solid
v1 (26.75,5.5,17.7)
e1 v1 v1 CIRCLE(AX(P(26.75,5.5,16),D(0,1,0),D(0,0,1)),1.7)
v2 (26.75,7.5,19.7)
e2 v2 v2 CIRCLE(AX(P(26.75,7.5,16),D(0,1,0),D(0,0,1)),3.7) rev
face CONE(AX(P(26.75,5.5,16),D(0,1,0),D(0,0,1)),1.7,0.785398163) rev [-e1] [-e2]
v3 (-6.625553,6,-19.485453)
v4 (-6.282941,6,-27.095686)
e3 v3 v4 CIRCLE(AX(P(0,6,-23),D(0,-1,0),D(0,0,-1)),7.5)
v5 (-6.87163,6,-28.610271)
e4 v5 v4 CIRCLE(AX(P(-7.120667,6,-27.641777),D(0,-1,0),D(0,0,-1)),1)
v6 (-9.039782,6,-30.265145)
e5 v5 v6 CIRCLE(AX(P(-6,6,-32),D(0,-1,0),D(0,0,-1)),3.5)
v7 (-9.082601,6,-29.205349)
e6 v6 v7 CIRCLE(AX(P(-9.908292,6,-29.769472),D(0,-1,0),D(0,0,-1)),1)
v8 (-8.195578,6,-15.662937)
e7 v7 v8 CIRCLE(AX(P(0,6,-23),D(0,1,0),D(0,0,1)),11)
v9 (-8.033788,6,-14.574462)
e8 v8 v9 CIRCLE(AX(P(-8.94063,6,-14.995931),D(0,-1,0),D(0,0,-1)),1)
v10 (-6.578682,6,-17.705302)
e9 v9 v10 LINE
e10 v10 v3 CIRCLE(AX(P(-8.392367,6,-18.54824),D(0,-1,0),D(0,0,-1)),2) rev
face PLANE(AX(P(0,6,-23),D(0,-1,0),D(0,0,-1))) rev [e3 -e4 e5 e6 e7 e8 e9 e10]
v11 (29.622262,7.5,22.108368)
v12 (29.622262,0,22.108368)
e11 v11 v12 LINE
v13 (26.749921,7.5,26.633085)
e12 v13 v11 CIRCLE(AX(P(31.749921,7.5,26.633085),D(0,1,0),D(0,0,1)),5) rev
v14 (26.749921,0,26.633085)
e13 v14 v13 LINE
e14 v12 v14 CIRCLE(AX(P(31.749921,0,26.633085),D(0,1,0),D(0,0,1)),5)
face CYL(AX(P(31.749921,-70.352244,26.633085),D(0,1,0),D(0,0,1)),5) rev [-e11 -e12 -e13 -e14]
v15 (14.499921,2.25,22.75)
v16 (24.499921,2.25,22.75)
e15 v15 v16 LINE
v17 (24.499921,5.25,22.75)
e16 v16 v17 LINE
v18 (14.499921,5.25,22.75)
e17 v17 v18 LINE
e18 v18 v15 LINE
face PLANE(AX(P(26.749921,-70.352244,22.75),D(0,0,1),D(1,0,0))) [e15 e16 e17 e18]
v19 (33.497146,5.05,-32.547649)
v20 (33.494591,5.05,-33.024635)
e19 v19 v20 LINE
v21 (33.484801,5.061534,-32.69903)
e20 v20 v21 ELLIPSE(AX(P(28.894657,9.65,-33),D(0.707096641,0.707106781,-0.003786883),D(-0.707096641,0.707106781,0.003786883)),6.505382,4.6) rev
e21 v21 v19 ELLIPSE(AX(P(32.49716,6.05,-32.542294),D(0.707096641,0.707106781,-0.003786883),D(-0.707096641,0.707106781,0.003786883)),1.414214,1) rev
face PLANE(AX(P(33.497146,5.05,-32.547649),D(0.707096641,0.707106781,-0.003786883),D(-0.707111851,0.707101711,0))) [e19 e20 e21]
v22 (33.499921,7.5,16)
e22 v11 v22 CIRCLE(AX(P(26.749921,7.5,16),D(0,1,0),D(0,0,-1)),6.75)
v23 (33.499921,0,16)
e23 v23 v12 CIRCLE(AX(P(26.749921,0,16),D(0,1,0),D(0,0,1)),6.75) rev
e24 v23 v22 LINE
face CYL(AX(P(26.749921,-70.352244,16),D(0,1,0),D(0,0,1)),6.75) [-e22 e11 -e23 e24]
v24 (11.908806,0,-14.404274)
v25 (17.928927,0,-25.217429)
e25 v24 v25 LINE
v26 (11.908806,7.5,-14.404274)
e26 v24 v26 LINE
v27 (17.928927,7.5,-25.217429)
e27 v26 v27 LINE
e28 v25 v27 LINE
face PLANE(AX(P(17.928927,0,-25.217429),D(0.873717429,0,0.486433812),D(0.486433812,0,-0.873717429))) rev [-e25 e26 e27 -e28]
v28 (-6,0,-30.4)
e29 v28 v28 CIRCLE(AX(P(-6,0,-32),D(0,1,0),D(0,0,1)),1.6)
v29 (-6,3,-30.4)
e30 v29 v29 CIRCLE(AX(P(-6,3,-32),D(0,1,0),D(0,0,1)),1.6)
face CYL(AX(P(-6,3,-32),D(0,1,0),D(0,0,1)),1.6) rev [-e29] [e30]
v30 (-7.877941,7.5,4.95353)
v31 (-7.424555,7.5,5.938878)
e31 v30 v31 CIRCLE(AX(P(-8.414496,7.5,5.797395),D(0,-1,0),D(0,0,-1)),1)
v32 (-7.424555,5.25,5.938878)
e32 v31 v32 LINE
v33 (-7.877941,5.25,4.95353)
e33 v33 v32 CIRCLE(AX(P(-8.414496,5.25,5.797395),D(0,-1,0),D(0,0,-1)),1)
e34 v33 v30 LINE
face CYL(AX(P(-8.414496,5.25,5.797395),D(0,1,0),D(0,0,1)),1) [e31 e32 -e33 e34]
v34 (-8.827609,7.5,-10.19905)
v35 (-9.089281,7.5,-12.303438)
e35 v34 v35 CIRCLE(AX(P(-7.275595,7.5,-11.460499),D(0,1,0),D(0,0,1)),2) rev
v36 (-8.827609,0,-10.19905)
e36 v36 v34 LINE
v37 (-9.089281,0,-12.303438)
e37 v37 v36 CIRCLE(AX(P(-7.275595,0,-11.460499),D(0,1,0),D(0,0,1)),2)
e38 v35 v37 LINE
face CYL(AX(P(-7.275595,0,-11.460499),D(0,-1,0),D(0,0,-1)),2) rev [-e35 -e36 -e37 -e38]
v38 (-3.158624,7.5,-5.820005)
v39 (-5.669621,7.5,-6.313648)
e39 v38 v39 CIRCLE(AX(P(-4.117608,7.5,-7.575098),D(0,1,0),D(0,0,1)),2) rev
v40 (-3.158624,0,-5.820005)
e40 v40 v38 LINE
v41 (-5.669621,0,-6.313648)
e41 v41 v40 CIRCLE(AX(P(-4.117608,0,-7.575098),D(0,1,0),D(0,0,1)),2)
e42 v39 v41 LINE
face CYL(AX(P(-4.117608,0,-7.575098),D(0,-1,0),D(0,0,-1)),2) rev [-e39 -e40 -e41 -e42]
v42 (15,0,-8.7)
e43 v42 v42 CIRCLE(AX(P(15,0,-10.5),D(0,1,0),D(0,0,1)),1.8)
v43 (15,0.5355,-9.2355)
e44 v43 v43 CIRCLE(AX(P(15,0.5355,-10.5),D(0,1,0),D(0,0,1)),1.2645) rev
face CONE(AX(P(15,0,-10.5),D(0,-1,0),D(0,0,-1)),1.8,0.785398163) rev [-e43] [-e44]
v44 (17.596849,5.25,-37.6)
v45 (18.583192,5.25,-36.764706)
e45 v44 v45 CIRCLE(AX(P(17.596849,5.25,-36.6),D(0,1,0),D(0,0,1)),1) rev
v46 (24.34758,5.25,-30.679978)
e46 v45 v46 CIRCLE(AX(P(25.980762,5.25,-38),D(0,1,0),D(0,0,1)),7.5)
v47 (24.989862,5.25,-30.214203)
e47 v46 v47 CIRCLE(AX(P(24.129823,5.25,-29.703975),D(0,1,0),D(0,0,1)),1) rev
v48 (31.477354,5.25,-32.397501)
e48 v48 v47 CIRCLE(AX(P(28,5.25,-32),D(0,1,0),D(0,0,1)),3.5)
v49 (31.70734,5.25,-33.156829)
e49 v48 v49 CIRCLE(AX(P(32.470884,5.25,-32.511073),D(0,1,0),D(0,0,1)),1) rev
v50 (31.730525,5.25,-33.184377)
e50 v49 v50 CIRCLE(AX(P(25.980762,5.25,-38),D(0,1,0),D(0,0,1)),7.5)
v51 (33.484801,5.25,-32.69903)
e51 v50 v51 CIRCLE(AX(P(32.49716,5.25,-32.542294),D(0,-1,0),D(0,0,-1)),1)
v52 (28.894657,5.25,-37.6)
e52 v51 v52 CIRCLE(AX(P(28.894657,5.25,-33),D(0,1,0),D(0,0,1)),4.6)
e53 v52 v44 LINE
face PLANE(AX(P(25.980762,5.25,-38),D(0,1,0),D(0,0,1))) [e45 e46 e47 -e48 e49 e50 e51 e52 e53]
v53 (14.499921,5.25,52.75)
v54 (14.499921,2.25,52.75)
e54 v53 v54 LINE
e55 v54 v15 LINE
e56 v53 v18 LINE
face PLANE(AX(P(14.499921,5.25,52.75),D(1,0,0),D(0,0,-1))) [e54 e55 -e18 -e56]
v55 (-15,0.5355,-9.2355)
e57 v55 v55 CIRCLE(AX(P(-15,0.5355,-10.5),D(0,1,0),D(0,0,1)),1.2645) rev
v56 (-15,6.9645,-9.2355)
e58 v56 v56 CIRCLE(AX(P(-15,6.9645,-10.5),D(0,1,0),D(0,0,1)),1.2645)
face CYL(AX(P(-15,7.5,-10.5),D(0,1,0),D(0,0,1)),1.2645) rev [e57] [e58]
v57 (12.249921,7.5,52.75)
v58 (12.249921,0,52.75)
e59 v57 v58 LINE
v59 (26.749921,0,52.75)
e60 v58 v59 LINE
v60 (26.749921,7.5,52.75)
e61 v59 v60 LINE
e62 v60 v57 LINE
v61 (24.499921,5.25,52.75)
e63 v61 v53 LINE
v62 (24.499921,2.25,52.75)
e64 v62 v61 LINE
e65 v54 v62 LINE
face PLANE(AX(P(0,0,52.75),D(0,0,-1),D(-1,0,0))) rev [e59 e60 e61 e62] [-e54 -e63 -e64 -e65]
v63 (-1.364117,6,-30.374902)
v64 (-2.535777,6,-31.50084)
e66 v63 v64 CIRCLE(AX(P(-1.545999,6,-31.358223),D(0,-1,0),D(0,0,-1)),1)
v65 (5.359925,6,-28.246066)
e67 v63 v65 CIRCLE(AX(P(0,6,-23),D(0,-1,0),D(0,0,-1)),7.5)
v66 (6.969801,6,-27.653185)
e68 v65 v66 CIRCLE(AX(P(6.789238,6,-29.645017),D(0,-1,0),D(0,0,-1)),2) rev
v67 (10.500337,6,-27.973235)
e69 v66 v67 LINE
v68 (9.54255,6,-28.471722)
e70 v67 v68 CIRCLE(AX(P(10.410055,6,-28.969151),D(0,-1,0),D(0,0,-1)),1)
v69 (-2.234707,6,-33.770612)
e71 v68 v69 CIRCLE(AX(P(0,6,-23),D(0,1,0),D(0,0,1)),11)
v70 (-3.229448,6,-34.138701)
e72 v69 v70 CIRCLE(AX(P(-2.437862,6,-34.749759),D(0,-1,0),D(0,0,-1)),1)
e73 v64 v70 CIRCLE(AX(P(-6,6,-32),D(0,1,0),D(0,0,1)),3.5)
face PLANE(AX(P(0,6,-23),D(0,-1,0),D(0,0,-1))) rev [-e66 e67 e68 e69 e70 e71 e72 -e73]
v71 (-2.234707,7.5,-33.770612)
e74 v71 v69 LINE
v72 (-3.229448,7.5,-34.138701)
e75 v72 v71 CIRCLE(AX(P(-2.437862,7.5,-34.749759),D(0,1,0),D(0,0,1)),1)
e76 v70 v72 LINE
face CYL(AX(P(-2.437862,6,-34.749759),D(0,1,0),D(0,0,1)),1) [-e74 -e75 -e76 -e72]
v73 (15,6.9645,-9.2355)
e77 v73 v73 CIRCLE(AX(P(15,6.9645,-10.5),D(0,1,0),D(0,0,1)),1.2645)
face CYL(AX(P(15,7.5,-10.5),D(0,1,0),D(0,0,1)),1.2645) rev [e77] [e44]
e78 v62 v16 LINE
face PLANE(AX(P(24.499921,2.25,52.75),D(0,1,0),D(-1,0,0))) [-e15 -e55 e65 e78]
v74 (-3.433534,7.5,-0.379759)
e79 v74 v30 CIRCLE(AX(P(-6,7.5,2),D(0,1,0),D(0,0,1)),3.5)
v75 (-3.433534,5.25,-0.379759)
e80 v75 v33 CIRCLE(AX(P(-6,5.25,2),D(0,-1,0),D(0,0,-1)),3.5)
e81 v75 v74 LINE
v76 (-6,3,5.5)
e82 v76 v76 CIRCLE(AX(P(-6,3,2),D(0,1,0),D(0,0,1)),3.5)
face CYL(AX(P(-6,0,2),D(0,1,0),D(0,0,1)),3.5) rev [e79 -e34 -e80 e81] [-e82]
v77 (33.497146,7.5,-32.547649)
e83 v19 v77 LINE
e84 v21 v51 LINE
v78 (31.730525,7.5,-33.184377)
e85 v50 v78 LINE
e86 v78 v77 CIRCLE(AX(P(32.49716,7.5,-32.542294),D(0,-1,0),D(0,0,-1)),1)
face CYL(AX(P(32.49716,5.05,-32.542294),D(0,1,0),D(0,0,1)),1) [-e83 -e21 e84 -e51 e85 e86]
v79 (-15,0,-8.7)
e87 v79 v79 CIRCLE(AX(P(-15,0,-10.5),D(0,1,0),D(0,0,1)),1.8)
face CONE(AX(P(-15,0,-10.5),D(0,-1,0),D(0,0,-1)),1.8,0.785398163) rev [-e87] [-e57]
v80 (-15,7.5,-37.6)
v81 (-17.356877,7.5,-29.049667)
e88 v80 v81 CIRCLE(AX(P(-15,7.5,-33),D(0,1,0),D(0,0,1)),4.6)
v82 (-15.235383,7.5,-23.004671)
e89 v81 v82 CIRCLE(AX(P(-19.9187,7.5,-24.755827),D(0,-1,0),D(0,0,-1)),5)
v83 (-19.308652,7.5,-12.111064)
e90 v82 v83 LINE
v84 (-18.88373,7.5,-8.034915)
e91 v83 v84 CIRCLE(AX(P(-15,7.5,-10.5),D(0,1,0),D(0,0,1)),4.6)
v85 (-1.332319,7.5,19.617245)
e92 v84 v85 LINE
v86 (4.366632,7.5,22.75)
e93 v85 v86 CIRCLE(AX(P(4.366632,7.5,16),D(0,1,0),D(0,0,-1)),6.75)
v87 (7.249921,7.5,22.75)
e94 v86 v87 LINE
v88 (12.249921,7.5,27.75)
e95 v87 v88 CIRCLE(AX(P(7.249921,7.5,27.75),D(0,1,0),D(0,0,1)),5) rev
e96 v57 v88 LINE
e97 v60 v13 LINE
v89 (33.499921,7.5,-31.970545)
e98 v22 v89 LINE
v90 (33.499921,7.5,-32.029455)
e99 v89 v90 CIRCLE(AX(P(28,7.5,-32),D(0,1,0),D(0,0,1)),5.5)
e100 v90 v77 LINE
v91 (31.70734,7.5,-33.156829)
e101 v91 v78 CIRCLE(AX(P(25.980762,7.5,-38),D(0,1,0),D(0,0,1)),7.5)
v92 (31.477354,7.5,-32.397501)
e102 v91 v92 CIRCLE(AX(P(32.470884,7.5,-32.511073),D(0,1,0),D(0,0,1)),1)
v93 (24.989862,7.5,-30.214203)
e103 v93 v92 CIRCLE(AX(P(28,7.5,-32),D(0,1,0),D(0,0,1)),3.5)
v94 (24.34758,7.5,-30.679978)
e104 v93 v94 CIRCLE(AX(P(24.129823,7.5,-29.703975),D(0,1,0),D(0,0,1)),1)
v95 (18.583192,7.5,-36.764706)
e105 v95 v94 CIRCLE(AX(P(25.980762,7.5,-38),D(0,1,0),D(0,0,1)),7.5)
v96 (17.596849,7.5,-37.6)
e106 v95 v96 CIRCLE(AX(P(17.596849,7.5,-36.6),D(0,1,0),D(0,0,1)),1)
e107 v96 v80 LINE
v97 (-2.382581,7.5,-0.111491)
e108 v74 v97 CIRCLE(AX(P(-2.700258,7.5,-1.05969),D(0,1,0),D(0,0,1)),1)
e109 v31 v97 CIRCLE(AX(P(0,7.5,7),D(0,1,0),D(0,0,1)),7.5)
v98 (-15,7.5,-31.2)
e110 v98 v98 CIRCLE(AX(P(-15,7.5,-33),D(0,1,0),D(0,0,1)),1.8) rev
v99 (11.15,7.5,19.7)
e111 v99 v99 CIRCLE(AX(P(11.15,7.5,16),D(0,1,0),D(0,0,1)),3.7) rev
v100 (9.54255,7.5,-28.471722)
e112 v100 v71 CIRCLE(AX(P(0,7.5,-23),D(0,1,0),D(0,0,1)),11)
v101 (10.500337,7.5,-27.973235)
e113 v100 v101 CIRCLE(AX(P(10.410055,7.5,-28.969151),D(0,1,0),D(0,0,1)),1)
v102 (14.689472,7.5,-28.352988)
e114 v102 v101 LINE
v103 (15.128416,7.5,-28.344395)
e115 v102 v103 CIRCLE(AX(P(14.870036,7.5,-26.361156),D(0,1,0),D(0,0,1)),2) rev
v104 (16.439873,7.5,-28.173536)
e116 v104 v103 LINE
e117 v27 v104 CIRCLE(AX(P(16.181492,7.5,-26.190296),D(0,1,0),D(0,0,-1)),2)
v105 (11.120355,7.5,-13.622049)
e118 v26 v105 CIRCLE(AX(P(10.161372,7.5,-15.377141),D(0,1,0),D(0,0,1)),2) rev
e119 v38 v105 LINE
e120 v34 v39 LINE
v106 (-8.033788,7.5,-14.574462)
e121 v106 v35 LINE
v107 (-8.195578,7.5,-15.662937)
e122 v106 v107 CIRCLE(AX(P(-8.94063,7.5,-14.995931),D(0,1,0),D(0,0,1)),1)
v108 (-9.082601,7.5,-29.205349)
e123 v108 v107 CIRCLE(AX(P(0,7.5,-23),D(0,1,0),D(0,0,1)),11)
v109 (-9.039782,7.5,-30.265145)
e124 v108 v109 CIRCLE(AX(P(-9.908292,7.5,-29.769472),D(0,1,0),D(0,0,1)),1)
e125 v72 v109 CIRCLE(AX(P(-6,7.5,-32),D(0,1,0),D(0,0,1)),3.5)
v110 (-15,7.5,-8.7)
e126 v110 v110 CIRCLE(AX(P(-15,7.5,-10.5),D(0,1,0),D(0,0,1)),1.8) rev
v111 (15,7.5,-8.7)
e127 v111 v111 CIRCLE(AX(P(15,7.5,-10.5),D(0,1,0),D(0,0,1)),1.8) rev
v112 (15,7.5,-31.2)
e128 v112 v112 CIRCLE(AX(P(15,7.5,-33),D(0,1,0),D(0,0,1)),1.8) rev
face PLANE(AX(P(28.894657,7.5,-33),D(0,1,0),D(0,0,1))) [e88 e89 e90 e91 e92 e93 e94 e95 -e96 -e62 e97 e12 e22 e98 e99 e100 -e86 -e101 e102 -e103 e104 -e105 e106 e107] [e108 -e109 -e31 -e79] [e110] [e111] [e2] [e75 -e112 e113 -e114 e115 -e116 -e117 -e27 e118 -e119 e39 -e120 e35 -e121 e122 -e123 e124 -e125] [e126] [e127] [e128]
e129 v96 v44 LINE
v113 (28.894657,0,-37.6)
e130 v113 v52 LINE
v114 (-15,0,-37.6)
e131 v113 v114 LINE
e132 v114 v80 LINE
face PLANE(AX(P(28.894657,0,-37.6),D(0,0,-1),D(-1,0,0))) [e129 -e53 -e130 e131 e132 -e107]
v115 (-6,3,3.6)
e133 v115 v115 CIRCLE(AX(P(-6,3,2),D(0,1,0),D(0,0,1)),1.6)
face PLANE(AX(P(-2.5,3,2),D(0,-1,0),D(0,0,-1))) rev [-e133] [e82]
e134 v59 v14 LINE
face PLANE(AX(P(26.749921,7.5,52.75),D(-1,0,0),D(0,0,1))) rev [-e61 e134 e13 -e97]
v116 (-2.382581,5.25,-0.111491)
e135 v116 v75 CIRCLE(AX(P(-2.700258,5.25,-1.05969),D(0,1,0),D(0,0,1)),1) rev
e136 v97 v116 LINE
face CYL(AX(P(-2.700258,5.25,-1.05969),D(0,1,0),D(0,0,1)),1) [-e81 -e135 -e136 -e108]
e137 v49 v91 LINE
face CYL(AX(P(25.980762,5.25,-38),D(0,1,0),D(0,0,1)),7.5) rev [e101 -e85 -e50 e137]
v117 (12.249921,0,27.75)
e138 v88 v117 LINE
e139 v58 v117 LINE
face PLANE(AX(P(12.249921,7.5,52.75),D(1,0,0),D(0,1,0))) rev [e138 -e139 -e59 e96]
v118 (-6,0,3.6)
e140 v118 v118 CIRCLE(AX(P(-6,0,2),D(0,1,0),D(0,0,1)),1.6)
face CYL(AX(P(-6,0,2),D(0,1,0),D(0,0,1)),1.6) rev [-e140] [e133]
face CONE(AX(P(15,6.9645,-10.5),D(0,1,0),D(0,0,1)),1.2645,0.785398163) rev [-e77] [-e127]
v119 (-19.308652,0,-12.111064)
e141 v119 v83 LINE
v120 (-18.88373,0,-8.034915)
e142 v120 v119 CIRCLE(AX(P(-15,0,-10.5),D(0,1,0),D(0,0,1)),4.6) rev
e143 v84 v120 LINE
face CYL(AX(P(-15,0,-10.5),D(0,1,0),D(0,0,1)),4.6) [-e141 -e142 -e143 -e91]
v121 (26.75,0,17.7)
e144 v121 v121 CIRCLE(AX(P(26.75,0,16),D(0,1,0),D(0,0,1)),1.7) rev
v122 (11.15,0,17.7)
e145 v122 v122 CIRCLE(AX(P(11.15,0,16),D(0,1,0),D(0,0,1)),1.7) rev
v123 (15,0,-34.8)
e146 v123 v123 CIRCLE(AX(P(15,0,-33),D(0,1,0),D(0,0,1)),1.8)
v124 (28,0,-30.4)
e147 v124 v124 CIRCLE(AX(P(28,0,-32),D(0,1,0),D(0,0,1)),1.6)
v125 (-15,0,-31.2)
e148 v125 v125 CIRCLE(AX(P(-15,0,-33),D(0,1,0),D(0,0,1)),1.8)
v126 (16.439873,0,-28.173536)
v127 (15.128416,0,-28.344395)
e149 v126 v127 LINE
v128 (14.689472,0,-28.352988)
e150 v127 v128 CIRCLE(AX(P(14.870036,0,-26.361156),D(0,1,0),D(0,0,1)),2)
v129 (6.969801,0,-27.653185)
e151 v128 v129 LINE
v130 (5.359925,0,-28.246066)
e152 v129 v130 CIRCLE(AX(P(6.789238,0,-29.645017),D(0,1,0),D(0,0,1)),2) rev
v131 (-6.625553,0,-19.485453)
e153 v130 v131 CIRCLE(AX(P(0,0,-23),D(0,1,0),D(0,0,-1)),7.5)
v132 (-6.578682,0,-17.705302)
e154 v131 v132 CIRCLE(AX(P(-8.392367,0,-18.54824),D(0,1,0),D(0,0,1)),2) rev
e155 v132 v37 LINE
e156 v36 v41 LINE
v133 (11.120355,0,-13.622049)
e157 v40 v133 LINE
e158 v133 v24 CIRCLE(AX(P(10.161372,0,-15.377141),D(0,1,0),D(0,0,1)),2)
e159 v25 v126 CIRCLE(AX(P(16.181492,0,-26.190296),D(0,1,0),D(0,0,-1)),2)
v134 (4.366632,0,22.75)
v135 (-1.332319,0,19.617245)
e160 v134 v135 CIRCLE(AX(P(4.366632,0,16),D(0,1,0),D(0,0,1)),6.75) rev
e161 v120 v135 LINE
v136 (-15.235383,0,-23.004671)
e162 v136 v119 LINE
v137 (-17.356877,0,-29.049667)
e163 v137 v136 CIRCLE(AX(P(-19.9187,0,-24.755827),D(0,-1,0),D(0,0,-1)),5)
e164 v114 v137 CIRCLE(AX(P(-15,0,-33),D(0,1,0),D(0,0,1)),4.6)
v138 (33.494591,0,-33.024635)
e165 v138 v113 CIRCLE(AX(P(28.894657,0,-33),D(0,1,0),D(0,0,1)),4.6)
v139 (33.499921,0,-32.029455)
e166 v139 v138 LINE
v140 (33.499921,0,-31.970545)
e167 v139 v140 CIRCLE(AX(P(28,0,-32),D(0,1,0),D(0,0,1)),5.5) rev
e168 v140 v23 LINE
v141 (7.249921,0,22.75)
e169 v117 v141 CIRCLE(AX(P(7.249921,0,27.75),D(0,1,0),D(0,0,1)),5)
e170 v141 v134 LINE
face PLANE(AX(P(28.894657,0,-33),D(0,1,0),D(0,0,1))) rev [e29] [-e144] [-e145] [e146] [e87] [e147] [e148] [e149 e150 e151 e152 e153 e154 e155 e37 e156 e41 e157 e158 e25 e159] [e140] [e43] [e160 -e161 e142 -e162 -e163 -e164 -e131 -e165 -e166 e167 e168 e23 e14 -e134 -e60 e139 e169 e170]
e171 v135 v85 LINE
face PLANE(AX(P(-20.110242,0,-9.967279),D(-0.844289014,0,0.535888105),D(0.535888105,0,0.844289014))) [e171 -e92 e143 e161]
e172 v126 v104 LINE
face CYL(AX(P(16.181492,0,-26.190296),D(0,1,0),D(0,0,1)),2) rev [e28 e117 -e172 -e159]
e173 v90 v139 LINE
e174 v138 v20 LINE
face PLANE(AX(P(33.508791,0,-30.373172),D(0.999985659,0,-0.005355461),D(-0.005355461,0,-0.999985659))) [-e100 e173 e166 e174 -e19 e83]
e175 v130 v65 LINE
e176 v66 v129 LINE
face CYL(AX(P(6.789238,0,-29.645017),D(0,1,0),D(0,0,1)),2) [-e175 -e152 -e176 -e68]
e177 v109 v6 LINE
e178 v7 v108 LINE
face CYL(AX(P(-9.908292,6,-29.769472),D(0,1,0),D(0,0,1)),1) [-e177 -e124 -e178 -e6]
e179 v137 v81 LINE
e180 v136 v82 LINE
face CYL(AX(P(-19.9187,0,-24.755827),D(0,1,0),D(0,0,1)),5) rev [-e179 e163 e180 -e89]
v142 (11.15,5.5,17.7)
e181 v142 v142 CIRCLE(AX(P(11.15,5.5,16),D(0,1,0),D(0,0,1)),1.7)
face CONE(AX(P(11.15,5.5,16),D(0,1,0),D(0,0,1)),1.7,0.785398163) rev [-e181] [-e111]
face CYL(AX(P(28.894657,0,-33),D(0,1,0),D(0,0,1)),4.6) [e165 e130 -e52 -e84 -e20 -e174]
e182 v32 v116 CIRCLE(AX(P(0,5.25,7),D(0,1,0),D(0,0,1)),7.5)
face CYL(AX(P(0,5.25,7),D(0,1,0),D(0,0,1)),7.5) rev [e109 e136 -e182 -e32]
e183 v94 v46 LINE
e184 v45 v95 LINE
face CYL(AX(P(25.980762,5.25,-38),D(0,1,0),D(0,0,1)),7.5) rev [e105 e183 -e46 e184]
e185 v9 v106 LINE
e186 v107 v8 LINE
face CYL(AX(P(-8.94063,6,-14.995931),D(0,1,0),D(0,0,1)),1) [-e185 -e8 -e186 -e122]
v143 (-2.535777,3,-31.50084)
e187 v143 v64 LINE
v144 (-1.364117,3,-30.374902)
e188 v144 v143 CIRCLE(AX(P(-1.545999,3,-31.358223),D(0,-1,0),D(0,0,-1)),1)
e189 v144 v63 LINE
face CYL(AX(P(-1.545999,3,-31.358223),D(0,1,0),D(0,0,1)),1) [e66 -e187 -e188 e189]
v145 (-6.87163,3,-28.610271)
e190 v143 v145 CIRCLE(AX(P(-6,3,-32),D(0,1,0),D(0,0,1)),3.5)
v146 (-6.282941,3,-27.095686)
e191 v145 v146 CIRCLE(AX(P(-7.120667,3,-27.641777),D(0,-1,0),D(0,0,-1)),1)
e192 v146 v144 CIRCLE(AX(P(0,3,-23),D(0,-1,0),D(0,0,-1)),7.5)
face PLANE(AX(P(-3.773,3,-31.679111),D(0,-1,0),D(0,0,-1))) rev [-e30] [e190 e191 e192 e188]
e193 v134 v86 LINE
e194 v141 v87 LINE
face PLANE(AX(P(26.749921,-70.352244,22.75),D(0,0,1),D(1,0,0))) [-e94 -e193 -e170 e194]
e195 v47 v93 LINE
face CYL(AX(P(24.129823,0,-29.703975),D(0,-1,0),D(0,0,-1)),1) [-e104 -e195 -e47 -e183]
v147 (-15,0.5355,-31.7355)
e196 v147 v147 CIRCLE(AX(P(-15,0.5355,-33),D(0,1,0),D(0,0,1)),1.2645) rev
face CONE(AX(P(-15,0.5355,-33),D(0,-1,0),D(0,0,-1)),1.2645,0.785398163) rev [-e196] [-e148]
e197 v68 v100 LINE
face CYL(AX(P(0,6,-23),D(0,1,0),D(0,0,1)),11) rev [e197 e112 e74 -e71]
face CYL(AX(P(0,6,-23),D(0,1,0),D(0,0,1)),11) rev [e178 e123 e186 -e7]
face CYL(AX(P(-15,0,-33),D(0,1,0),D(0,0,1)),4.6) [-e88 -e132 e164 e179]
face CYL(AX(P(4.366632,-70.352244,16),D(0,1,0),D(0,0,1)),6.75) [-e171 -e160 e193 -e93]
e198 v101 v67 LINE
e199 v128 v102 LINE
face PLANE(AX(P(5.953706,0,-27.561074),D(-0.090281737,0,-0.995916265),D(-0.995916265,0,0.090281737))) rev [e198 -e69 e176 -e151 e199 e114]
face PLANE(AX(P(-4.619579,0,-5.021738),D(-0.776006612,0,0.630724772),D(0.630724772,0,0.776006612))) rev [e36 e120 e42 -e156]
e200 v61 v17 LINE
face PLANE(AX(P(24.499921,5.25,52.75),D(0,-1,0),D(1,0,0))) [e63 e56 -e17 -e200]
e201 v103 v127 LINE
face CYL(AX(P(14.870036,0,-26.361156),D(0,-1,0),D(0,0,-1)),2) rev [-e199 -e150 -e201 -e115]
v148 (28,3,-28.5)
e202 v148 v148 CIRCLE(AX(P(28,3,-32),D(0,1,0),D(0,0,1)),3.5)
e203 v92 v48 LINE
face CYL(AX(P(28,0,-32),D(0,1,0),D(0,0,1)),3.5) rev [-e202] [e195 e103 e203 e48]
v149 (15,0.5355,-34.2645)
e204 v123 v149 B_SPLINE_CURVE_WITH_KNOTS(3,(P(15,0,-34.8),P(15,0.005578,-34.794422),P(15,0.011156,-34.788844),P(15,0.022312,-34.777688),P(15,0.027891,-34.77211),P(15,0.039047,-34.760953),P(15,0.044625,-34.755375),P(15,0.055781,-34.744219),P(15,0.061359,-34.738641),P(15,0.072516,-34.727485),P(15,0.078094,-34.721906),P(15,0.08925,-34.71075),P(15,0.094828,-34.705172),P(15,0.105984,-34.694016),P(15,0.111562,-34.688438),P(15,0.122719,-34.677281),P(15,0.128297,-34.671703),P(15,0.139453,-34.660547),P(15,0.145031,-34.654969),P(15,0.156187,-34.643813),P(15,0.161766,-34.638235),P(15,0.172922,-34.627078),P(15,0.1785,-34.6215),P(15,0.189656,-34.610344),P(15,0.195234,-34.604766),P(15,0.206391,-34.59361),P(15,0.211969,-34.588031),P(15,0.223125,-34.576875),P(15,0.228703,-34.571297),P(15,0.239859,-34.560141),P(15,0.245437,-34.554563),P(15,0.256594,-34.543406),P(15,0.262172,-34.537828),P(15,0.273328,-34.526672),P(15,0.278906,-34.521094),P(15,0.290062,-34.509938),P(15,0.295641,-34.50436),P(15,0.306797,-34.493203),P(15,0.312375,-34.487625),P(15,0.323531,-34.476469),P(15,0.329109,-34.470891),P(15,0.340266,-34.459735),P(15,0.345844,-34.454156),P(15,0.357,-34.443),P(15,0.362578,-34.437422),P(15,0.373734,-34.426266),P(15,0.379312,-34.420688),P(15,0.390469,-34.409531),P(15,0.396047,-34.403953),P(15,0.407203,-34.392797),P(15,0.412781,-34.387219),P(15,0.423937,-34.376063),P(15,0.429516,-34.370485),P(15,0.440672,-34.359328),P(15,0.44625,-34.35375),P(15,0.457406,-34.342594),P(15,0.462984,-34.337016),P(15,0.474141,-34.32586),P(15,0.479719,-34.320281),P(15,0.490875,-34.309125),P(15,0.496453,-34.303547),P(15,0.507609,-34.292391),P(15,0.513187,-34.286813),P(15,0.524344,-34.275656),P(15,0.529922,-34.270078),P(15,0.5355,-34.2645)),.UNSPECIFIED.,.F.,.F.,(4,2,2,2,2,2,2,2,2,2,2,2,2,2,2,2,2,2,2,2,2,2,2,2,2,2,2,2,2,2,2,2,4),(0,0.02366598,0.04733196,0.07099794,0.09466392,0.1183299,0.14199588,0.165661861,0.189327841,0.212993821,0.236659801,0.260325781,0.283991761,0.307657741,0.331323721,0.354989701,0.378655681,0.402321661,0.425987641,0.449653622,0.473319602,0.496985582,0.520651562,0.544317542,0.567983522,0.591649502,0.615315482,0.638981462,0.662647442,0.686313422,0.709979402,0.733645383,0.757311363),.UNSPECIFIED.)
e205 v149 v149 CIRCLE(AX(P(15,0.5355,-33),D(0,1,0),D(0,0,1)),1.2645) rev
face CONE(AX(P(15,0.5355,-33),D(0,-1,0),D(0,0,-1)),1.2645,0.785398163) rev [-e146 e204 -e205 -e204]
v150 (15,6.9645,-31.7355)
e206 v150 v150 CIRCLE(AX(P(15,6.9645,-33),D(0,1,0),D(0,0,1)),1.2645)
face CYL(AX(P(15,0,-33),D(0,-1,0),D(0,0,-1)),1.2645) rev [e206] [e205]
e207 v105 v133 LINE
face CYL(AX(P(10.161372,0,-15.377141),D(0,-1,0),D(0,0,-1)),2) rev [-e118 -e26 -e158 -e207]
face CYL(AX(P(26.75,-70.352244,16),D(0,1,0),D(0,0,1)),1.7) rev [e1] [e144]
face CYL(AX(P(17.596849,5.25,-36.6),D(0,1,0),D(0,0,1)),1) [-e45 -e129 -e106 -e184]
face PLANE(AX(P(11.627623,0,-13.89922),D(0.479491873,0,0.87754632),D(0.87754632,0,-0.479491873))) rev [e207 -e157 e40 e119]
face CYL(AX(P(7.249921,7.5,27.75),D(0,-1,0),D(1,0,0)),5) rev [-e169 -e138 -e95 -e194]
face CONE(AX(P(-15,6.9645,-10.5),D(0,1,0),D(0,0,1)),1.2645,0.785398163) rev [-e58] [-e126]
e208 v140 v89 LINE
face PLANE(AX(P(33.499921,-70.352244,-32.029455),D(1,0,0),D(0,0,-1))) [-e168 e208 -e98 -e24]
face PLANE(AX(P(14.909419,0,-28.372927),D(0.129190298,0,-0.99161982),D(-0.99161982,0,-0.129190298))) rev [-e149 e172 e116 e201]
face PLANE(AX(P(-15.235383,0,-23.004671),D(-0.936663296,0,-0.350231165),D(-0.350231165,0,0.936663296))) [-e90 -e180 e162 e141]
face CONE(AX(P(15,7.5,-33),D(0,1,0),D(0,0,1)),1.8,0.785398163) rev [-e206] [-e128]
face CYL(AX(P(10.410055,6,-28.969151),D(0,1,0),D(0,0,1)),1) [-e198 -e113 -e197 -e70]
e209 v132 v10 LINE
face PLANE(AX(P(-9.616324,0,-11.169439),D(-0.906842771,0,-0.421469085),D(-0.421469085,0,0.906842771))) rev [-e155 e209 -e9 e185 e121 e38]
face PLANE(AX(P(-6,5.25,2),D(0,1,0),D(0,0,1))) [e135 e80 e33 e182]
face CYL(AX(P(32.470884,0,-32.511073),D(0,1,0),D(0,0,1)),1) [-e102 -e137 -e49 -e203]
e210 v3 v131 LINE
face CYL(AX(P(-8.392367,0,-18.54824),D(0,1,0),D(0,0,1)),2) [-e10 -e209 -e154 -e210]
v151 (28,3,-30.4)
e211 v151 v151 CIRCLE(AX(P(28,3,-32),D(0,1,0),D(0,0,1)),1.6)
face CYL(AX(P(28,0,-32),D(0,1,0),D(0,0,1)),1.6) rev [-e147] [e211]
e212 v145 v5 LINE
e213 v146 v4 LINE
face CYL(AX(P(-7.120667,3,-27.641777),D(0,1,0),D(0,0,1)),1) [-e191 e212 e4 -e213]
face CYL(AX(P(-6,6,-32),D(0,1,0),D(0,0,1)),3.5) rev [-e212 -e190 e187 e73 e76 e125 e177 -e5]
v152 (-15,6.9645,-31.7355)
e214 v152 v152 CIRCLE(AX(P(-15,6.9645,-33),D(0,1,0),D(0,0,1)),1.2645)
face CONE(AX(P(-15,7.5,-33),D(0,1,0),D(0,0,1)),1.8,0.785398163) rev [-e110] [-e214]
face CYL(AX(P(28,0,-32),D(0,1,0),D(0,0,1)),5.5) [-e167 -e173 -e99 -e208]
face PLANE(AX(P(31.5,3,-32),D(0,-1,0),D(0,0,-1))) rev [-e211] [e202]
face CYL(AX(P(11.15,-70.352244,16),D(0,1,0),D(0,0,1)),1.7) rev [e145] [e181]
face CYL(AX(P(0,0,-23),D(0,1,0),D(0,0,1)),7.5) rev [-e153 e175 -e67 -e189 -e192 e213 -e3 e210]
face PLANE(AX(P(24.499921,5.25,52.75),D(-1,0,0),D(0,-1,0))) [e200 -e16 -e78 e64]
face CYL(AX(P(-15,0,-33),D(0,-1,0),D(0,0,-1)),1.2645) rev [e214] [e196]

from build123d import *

# Parameters (mm, degrees)
BOSS_EXTRUDE1_DEPTH        = 7.5
CUT_EXTRUDE1_DEPTH         = 2.45
CUT_EXTRUDE2_DEPTH         = 2.25
CUT_EXTRUDE3_DEPTH         = 1.5
CUT_EXTRUDE4_DEPTH         = 3
CUT_EXTRUDE5_DEPTH         = 2.25
DRAFT1_ANGLE               = 45
F_3_2_3_2_DIAMETER_HOLE1_D = 3.2
M2_CLEARANCE_HOLE1_D       = 2.529
M2_CLEARANCE_HOLE2_D       = 2.529
FILLET1_START              = 6
FILLET1_DEPTH              = 2
FILLET1_START_2            = 5.25
FILLET1_2_DEPTH            = 1.45785
FILLET2_R                  = 2
FILLET3_R                  = 4.6
FILLET4_R                  = 5.5
CHAMFER2_SIZE              = 0.5355
SKETCH15_R                 = 1.7
BOSS_EXTRUDE2_DEPTH        = 7.5
SKETCH16_R                 = 7.5
CUT_EXTRUDE6_DEPTH         = 51.631734262
BOSS_EXTRUDE3_START        = 2.25
BOSS_EXTRUDE3_DEPTH        = 2.25
CHAMFER3_SIZE              = 2
SKETCH18_W                 = 14.5
SKETCH18_H                 = 7.5
SKETCH18_W_2               = 10
SKETCH18_H_2               = 3
BOSS_EXTRUDE4_DEPTH        = 30
FILLET5_R                  = 5


with BuildPart() as part:
    # Sketch1 → Boss-Extrude1 (new body)
    with BuildSketch(Plane(origin=(0, 7.5, 0), x_dir=(1, 0, 0), z_dir=(0, 1, 0))):
        with BuildLine():
            Line((33.508791414, 30.373171934), (33.494591401, 33.024635312))
            ThreePointArc((33.494591401, 33.024635312), (32.138627038, 36.261389585), (28.894657368, 37.600000191))
            Line((28.894657368, 37.600000191), (-15.000000337, 37.600000191))
            ThreePointArc((-15.000000337, 37.600000191), (-19.434610369, 34.222388779), (-17.356877162, 29.049667087))
            ThreePointArc((-17.356877162, 29.049667087), (-15.200807807, 26.41157286), (-15.235383316, 23.004670931))
            Line((-15.235383316, 23.004670931), (-20.110241908, 9.967278565))
            Line((-20.110241908, 9.967278565), (-10.643589577, -4.947384576))
            ThreePointArc((-10.643589577, -4.947384576), (-7.177416672, -7.372493833), (-3.014699262, -6.619305089))
            Line((-3.014699262, -6.619305089), (18.314983661, 7.165348002))
            Line((18.314983661, 7.165348002), (33.508791414, 30.373171934))
        make_face()
        with BuildLine():
            Line((5.953705515, 27.561073907), (14.90941878, 28.372926652))
            Line((14.90941878, 28.372926652), (16.439872709, 28.173535922))
            ThreePointArc((16.439872709, 28.173535922), (17.967679799, 27.090037106), (17.928926971, 25.217428657))
            Line((17.928926971, 25.217428657), (11.627622505, 13.899219688))
            Line((11.627622505, 13.899219688), (-4.619579129, 5.021738281))
            Line((-4.619579129, 5.021738281), (-9.616324178, 11.1694391))
            Line((-9.616324178, 11.1694391), (-6.12774016, 18.675558318))
            ThreePointArc((-6.12774016, 18.675558318), (-4.443609513, 29.041881421), (5.953705515, 27.561073907))
        make_face(mode=Mode.SUBTRACT)
    extrude(amount=-BOSS_EXTRUDE1_DEPTH)

    # Sketch2 → Cut-Extrude1 (cut)
    with BuildSketch(Plane(origin=(0, 7.5, 0), x_dir=(-1, 0, 0), z_dir=(0, 1, 0))):
        with BuildLine():
            Line((-33.497145917, -32.54764942), (-33.494591401, -33.024635312))
            ThreePointArc((-33.494591401, -33.024635312), (-33.492579262, -32.86174588), (-33.484800813, -32.699029834))
            ThreePointArc((-33.484800813, -32.699029834), (-33.493851534, -32.623574342), (-33.497145917, -32.54764942))
        make_face()
    extrude(amount=-CUT_EXTRUDE1_DEPTH, mode=Mode.SUBTRACT)

    # Sketch3 → Cut-Extrude2 (cut)
    with BuildSketch(Plane(origin=(0, 7.5, 0), x_dir=(-1, 0, 0), z_dir=(0, 1, 0))):
        with BuildLine():
            Line((-28.894657368, -37.600000191), (-18.491436366, -37.600000191))
            ThreePointArc((-18.491436366, -37.600000191), (-23.607799499, -30.885293511), (-31.730525182, -33.184377023))
            ThreePointArc((-31.730525182, -33.184377023), (-32.763808582, -33.506087854), (-33.484800813, -32.699029834))
            ThreePointArc((-33.484800813, -32.699029834), (-32.252071823, -36.144482371), (-28.894657368, -37.600000191))
        make_face()
    extrude(amount=-CUT_EXTRUDE2_DEPTH, mode=Mode.SUBTRACT)

    # Sketch4 → Cut-Extrude3 (cut)
    with BuildSketch(Plane(origin=(0, 7.5, 0), x_dir=(-1, 0, 0), z_dir=(0, 1, 0))):
        with BuildLine():
            Line((-5.953705515, -27.561073907), (-9.841612021, -27.913520158))
            ThreePointArc((-9.841612021, -27.913520158), (-4.493157895, -33.040494787), (2.893623834, -33.612583988))
            ThreePointArc((2.893623834, -33.612583988), (7.941450772, -34.912175973), (8.683298997, -29.7528003))
            ThreePointArc((8.683298997, -29.7528003), (10.977342797, -22.294353677), (7.747237051, -15.191010811))
            Line((7.747237051, -15.191010811), (6.12774016, -18.675558318))
            ThreePointArc((6.12774016, -18.675558318), (4.443609513, -29.041881421), (-5.953705515, -27.561073907))
        make_face()
    extrude(amount=-CUT_EXTRUDE3_DEPTH, mode=Mode.SUBTRACT)

    # Sketch5 → Cut-Extrude4 (cut)
    with BuildSketch(Plane(origin=(0, 6, 0), x_dir=(-1, 0, 0), z_dir=(0, 1, 0))):
        with BuildLine():
            ThreePointArc((2.535777276, -31.50083979), (7.941450772, -34.912175973), (6.871629886, -28.610271199))
            ThreePointArc((6.871629886, -28.610271199), (6.188596449, -28.004054077), (6.282941422, -27.095685814))
            ThreePointArc((6.282941422, -27.095685814), (4.160251273, -29.240377085), (1.364117032, -30.374902283))
            ThreePointArc((1.364117032, -30.374902283), (2.238897357, -30.637186973), (2.535777276, -31.50083979))
        make_face()
    extrude(amount=-CUT_EXTRUDE4_DEPTH, mode=Mode.SUBTRACT)

    # Sketch6 → Cut-Extrude5 (cut)
    with BuildSketch(Plane(origin=(0, 7.5, 0), x_dir=(-1, 0, 0), z_dir=(0, 1, 0))):
        with BuildLine():
            Line((3.014699262, 6.619305089), (-5.019332498, 1.427181927))
            ThreePointArc((-5.019332498, 1.427181927), (-1.182556182, -0.406183962), (3.034363761, 0.141236513))
            ThreePointArc((3.034363761, 0.141236513), (3.533157671, 4.48287916), (7.877941264, 4.953529517))
            ThreePointArc((7.877941264, 4.953529517), (7.570630335, 6.33394974), (8.951050558, 6.64126067))
            ThreePointArc((8.951050558, 6.64126067), (5.979658402, 7.499962383), (3.014699262, 6.619305089))
        make_face()
    extrude(amount=-CUT_EXTRUDE5_DEPTH, mode=Mode.SUBTRACT)

    # Draft1
    draft1_faces = [part.faces().sort_by_distance(p)[0] for p in [
        (33.492642897, 5.05, -32.742645392),
    ]]
    draft(draft1_faces, Plane(origin=(33.508791414, 0, -30.373171934), x_dir=(0.005355461101285183, 0, 0.9999856594153701), z_dir=(0.9999856594153701, 0, -0.005355461101285183)), DRAFT1_ANGLE)

    # Sketch7 → Cut-Revolve1 (revolve, cut)
    with BuildSketch(Plane(origin=(0, 0, -32), x_dir=(-1, 0, 0), z_dir=(0, 0, -1)), mode=Mode.PRIVATE) as cut_revolve1_sk:
        Polygon((-29.6, 0), (-28, 0), (-28, 7.5), (-31.5, 7.5), (-31.5, 3), (-29.6, 3), align=None)
    revolve(cut_revolve1_sk.sketch.rotate(Axis((28, 0, -32), (0, 1, 0)), 270), axis=Axis((28, 0, -32), (0, 1, 0)), mode=Mode.SUBTRACT)

    # Sketch8 → Cut-Revolve2 (revolve, cut)
    with BuildSketch(Plane(origin=(0, 0, 2), x_dir=(-1, 0, 0), z_dir=(0, 0, -1)), mode=Mode.PRIVATE) as cut_revolve2_sk:
        Polygon((4.4, 0), (6, 0), (6, 7.5), (2.5, 7.5), (2.5, 3), (4.4, 3), align=None)
    revolve(cut_revolve2_sk.sketch.rotate(Axis((-6, 0, 2), (0, 1, 0)), 270), axis=Axis((-6, 0, 2), (0, 1, 0)), mode=Mode.SUBTRACT)

    # Ø3.2 (3.2) Diameter Hole1 (through all)
    with Locations(Plane(origin=(0, 3, 0), x_dir=(1, 0, 0), z_dir=(0, 1, 0))):
        with Locations((-6, 32)):
            Hole(F_3_2_3_2_DIAMETER_HOLE1_D / 2)

    # M2 Clearance Hole1 (through all)
    with Locations(Plane(origin=(0, 7.5, 0), x_dir=(1, 0, 0), z_dir=(0, 1, 0))):
        with Locations((-15.000000337, 10.500000191), (14.999999663, 10.500000191)):
            Hole(M2_CLEARANCE_HOLE1_D / 2)

    # M2 Clearance Hole2 (through all)
    with Locations(Plane(origin=(0, 0, 0), x_dir=(-1, 0, 0), z_dir=(0, -1, 0))):
        with Locations((15.000000337, 33.000000191), (-14.999999663, 33.000000191)):
            Hole(M2_CLEARANCE_HOLE2_D / 2)

    # Fillet1: read off the stored shape, not the designer's step
    # Fillet1 outline → Fillet1 (cut)
    with BuildSketch(Plane(origin=(0, 0, 0), x_dir=(1, 0, 0), z_dir=(0, 1, 0)).offset(FILLET1_START)):
        with BuildLine():
            ThreePointArc((-3.034363761, -0.141236513), (-2.711418413, -0.00727448), (-2.382580753, 0.111491332))
            ThreePointArc((-2.382580753, 0.111491332), (-2.94758878, 0.090759023), (-3.433534146, 0.379759025))
            ThreePointArc((-3.433534146, 0.379759025), (-3.221709612, 0.128638654), (-3.034363761, -0.141236513))
        make_face()
        with BuildLine():
            ThreePointArc((5.631594691, -1.031497568), (5.054763815, -1.191044082), (4.490128887, -0.992609337))
            ThreePointArc((4.490128887, -0.992609337), (4.759692983, -1.20385277), (5.019332498, -1.427181927))
            Line((5.019332498, -1.427181927), (5.631594691, -1.031497568))
        make_face()
        with BuildLine():
            ThreePointArc((10.500336649, 27.973234821), (9.94838279, 28.082100438), (9.542550367, 28.471721829))
            ThreePointArc((9.542550367, 28.471721829), (9.696098966, 28.194773551), (9.841612021, 27.913520158))
            Line((9.841612021, 27.913520158), (10.500336649, 27.973234821))
        make_face()
        with BuildLine():
            ThreePointArc((-2.234706741, 33.770612057), (-2.784899636, 33.811907429), (-3.229448171, 34.138701139))
            ThreePointArc((-3.229448171, 34.138701139), (-3.049784673, 33.883143521), (-2.893623835, 33.612583987))
            ThreePointArc((-2.893623835, 33.612583987), (-2.565382396, 33.696672904), (-2.234706741, 33.770612057))
        make_face()
        with BuildLine():
            ThreePointArc((-7.747237051, 15.191010811), (-7.974899066, 15.423656634), (-8.195577832, 15.662936709))
            ThreePointArc((-8.195577832, 15.662936709), (-7.951497485, 15.142955041), (-8.033787627, 14.574461871))
            Line((-8.033787627, 14.574461871), (-7.747237051, 15.191010811))
        make_face()
        with BuildLine():
            ThreePointArc((-8.683298997, 29.7528003), (-8.872984413, 30.001010114), (-9.039782423, 30.265144725))
            ThreePointArc((-9.039782423, 30.265144725), (-8.909106864, 29.72910235), (-9.08260068, 29.20534914))
            ThreePointArc((-9.08260068, 29.20534914), (-8.887166226, 29.482150082), (-8.683298997, 29.7528003))
        make_face()
        with BuildLine():
            ThreePointArc((17.596848914, 37.600000191), (18.24310511, 37.363120712), (18.583191644, 36.764706051))
            ThreePointArc((18.583191644, 36.764706051), (18.525606258, 37.18106705), (18.491436366, 37.600000191))
            Line((18.491436366, 37.600000191), (17.596848914, 37.600000191))
        make_face()
        with BuildLine():
            ThreePointArc((31.47735426, 32.397501388), (31.513820005, 32.800949768), (31.707340291, 33.156829305))
            ThreePointArc((31.707340291, 33.156829305), (31.557730942, 32.9852798), (31.402984615, 32.818349381))
            ThreePointArc((31.402984615, 32.818349381), (31.446598906, 32.60906156), (31.47735426, 32.397501388))
        make_face()
        with BuildLine():
            ThreePointArc((24.989862222, 30.214203103), (24.88644986, 30.401311311), (24.79465386, 30.594384076))
            ThreePointArc((24.79465386, 30.594384076), (24.570467623, 30.633788663), (24.347580417, 30.67997831))
            ThreePointArc((24.347580417, 30.67997831), (24.716890305, 30.513513441), (24.989862222, 30.214203103))
        make_face()
    extrude(amount=FILLET1_DEPTH, mode=Mode.SUBTRACT)

    # Fillet1 2 outline → Fillet1 2 (cut)
    with BuildSketch(Plane(origin=(0, 0, 0), x_dir=(1, 0, 0), z_dir=(0, 1, 0)).offset(FILLET1_START_2)):
        with BuildLine():
            ThreePointArc((-3.034363761, -0.141236513), (-2.711418413, -0.00727448), (-2.382580753, 0.111491332))
            ThreePointArc((-2.382580753, 0.111491332), (-2.94758878, 0.090759023), (-3.433534146, 0.379759025))
            ThreePointArc((-3.433534146, 0.379759025), (-3.221709612, 0.128638654), (-3.034363761, -0.141236513))
        make_face()
        with BuildLine():
            ThreePointArc((5.631594691, -1.031497568), (5.054763815, -1.191044082), (4.490128887, -0.992609337))
            ThreePointArc((4.490128887, -0.992609337), (4.759692983, -1.20385277), (5.019332498, -1.427181927))
            Line((5.019332498, -1.427181927), (5.631594691, -1.031497568))
        make_face()
        with BuildLine():
            ThreePointArc((17.596848914, 37.600000191), (18.24310511, 37.363120712), (18.583191644, 36.764706051))
            ThreePointArc((18.583191644, 36.764706051), (18.525606258, 37.18106705), (18.491436366, 37.600000191))
            Line((18.491436366, 37.600000191), (17.596848914, 37.600000191))
        make_face()
        with BuildLine():
            ThreePointArc((31.47735426, 32.397501388), (31.513820005, 32.800949768), (31.707340291, 33.156829305))
            ThreePointArc((31.707340291, 33.156829305), (31.557730942, 32.9852798), (31.402984615, 32.818349381))
            ThreePointArc((31.402984615, 32.818349381), (31.446598906, 32.60906156), (31.47735426, 32.397501388))
        make_face()
        with BuildLine():
            ThreePointArc((24.989862222, 30.214203103), (24.88644986, 30.401311311), (24.79465386, 30.594384076))
            ThreePointArc((24.79465386, 30.594384076), (24.570467623, 30.633788663), (24.347580417, 30.67997831))
            ThreePointArc((24.347580417, 30.67997831), (24.716890305, 30.513513441), (24.989862222, 30.214203103))
        make_face()
    extrude(amount=FILLET1_2_DEPTH, mode=Mode.SUBTRACT)

    # Fillet2
    fillet2_edges = [part.edges().sort_by_distance(p)[0] for p in [
        (-6.12774016, 3, -18.675558318),
        (5.953705515, 3, -27.561073907),
        (14.90941878, 3.75, -28.372926652),
        (11.627622505, 3.75, -13.899219688),
        (-4.619579129, 3.75, -5.021738281),
        (-9.616324178, 3.75, -11.1694391),
    ]]
    fillet(fillet2_edges, radius=FILLET2_R)

    # Fillet3
    fillet3_edges = [part.edges().sort_by_distance(p)[0] for p in [
        (18.314983661, 3.75, -7.165348002),
        (-20.110241908, 3.75, -9.967278565),
    ]]
    fillet(fillet3_edges, radius=FILLET3_R)

    # Fillet4
    fillet4_edges = [part.edges().sort_by_distance(p)[0] for p in [
        (33.508791414, 3.75, -30.373171934),
    ]]
    fillet(fillet4_edges, radius=FILLET4_R)

    # Chamfer2
    chamfer2_edges = [part.edges().sort_by_distance(p)[0] for p in [
        (16.264499663, 7.5, -10.500000191),
        (16.264499663, 0, -10.500000191),
        (-13.735500337, 7.5, -10.500000191),
        (-13.735500337, 0, -10.500000191),
        (13.735499663, 0, -33.000000191),
        (13.735499663, 7.5, -33.000000191),
        (-16.264500337, 0, -33.000000191),
        (-16.264500337, 7.5, -33.000000191),
    ]]
    chamfer(chamfer2_edges, length=CHAMFER2_SIZE)

    # Sketch15 → Boss-Extrude2 (add)
    with BuildSketch(Plane(origin=(0, 7.5, 0), x_dir=(1, 0, 0), z_dir=(0, 1, 0))):
        with BuildLine():
            Line((33.499921127, 32.029455036), (33.499921127, -16))
            ThreePointArc((33.499921127, -16), (31.5228919, -20.772970773), (26.749921127, -22.75))
            Line((26.749921127, -22.75), (4.366631947, -22.75))
            ThreePointArc((4.366631947, -22.75), (1.115009412, -21.915188153), (-1.332318897, -19.617244707))
            Line((-1.332318897, -19.617244707), (-10.643589577, -4.947384576))
            ThreePointArc((-10.643589577, -4.947384576), (-7.177416672, -7.372493833), (-3.014699262, -6.619305089))
            Line((-3.014699262, -6.619305089), (17.496796644, 6.636581389))
            ThreePointArc((17.496796644, 6.636581389), (18.243055911, 7.237702508), (18.848581021, 7.980392775))
            Line((18.848581021, 7.980392775), (32.601564667, 28.987425916))
            ThreePointArc((32.601564667, 28.987425916), (33.270637908, 30.443502208), (33.499921127, 32.029455036))
        make_face()
        with Locations(Location((26.75, -16, 0), (0, 0, 270))):
            Circle(SKETCH15_R, mode=Mode.SUBTRACT)
        with Locations(Location((11.15, -16, 0), (0, 0, 270))):
            Circle(SKETCH15_R, mode=Mode.SUBTRACT)
    extrude(amount=-BOSS_EXTRUDE2_DEPTH)

    # Sketch16 → Cut-Extrude6 (cut, through all)
    with BuildSketch(Plane(origin=(0, 5.25, 0), x_dir=(1, 0, 0), z_dir=(0, 1, 0))):
        with Locations((0, -7)):
            Circle(SKETCH16_R)
    extrude(amount=CUT_EXTRUDE6_DEPTH, mode=Mode.SUBTRACT)

    # Sketch17 → Boss-Extrude3 (add)
    with BuildSketch(Plane(origin=(0, 5.25, 0), x_dir=(1, 0, 0), z_dir=(0, 1, 0)).offset(BOSS_EXTRUDE3_START)):
        with BuildLine():
            Line((5.631594691, -1.031497568), (5.019332498, -1.427181927))
            ThreePointArc((5.019332498, -1.427181927), (4.759692983, -1.20385277), (4.490128887, -0.992609337))
            ThreePointArc((4.490128887, -0.992609337), (5.054763815, -1.191044082), (5.631594691, -1.031497568))
        make_face()
        with BuildLine():
            ThreePointArc((-7.424555216, -5.938878024), (-7.490082083, -6.614422014), (-7.494269712, -7.293123655))
            ThreePointArc((-7.494269712, -7.293123655), (-8.246430372, -7.020313794), (-8.951050558, -6.64126067))
            ThreePointArc((-8.951050558, -6.64126067), (-7.996494628, -6.70584153), (-7.424555216, -5.938878024))
        make_face()
    extrude(amount=-BOSS_EXTRUDE3_DEPTH)

    # Chamfer3
    chamfer3_edges = [part.edges().sort_by_distance(p)[0] for p in [
        (26.75, 7.5, 14.3),
        (11.15, 7.5, 14.3),
    ]]
    chamfer(chamfer3_edges, length=CHAMFER3_SIZE)

    # Sketch18 → Boss-Extrude4 (add)
    with BuildSketch(Plane.XY.offset(22.75)):
        with Locations((19.499921127, 3.75)):
            Rectangle(SKETCH18_W, SKETCH18_H)
        with Locations((19.499921127, 3.75)):
            Rectangle(SKETCH18_W_2, SKETCH18_H_2, mode=Mode.SUBTRACT)
    extrude(amount=BOSS_EXTRUDE4_DEPTH)

    # Fillet5
    fillet5_edges = [part.edges().sort_by_distance(p)[0] for p in [
        (26.749921127, 3.75, 22.75),
        (12.249921127, 3.75, 22.75),
    ]]
    fillet(fillet5_edges, radius=FILLET5_R)


solid = part.part
